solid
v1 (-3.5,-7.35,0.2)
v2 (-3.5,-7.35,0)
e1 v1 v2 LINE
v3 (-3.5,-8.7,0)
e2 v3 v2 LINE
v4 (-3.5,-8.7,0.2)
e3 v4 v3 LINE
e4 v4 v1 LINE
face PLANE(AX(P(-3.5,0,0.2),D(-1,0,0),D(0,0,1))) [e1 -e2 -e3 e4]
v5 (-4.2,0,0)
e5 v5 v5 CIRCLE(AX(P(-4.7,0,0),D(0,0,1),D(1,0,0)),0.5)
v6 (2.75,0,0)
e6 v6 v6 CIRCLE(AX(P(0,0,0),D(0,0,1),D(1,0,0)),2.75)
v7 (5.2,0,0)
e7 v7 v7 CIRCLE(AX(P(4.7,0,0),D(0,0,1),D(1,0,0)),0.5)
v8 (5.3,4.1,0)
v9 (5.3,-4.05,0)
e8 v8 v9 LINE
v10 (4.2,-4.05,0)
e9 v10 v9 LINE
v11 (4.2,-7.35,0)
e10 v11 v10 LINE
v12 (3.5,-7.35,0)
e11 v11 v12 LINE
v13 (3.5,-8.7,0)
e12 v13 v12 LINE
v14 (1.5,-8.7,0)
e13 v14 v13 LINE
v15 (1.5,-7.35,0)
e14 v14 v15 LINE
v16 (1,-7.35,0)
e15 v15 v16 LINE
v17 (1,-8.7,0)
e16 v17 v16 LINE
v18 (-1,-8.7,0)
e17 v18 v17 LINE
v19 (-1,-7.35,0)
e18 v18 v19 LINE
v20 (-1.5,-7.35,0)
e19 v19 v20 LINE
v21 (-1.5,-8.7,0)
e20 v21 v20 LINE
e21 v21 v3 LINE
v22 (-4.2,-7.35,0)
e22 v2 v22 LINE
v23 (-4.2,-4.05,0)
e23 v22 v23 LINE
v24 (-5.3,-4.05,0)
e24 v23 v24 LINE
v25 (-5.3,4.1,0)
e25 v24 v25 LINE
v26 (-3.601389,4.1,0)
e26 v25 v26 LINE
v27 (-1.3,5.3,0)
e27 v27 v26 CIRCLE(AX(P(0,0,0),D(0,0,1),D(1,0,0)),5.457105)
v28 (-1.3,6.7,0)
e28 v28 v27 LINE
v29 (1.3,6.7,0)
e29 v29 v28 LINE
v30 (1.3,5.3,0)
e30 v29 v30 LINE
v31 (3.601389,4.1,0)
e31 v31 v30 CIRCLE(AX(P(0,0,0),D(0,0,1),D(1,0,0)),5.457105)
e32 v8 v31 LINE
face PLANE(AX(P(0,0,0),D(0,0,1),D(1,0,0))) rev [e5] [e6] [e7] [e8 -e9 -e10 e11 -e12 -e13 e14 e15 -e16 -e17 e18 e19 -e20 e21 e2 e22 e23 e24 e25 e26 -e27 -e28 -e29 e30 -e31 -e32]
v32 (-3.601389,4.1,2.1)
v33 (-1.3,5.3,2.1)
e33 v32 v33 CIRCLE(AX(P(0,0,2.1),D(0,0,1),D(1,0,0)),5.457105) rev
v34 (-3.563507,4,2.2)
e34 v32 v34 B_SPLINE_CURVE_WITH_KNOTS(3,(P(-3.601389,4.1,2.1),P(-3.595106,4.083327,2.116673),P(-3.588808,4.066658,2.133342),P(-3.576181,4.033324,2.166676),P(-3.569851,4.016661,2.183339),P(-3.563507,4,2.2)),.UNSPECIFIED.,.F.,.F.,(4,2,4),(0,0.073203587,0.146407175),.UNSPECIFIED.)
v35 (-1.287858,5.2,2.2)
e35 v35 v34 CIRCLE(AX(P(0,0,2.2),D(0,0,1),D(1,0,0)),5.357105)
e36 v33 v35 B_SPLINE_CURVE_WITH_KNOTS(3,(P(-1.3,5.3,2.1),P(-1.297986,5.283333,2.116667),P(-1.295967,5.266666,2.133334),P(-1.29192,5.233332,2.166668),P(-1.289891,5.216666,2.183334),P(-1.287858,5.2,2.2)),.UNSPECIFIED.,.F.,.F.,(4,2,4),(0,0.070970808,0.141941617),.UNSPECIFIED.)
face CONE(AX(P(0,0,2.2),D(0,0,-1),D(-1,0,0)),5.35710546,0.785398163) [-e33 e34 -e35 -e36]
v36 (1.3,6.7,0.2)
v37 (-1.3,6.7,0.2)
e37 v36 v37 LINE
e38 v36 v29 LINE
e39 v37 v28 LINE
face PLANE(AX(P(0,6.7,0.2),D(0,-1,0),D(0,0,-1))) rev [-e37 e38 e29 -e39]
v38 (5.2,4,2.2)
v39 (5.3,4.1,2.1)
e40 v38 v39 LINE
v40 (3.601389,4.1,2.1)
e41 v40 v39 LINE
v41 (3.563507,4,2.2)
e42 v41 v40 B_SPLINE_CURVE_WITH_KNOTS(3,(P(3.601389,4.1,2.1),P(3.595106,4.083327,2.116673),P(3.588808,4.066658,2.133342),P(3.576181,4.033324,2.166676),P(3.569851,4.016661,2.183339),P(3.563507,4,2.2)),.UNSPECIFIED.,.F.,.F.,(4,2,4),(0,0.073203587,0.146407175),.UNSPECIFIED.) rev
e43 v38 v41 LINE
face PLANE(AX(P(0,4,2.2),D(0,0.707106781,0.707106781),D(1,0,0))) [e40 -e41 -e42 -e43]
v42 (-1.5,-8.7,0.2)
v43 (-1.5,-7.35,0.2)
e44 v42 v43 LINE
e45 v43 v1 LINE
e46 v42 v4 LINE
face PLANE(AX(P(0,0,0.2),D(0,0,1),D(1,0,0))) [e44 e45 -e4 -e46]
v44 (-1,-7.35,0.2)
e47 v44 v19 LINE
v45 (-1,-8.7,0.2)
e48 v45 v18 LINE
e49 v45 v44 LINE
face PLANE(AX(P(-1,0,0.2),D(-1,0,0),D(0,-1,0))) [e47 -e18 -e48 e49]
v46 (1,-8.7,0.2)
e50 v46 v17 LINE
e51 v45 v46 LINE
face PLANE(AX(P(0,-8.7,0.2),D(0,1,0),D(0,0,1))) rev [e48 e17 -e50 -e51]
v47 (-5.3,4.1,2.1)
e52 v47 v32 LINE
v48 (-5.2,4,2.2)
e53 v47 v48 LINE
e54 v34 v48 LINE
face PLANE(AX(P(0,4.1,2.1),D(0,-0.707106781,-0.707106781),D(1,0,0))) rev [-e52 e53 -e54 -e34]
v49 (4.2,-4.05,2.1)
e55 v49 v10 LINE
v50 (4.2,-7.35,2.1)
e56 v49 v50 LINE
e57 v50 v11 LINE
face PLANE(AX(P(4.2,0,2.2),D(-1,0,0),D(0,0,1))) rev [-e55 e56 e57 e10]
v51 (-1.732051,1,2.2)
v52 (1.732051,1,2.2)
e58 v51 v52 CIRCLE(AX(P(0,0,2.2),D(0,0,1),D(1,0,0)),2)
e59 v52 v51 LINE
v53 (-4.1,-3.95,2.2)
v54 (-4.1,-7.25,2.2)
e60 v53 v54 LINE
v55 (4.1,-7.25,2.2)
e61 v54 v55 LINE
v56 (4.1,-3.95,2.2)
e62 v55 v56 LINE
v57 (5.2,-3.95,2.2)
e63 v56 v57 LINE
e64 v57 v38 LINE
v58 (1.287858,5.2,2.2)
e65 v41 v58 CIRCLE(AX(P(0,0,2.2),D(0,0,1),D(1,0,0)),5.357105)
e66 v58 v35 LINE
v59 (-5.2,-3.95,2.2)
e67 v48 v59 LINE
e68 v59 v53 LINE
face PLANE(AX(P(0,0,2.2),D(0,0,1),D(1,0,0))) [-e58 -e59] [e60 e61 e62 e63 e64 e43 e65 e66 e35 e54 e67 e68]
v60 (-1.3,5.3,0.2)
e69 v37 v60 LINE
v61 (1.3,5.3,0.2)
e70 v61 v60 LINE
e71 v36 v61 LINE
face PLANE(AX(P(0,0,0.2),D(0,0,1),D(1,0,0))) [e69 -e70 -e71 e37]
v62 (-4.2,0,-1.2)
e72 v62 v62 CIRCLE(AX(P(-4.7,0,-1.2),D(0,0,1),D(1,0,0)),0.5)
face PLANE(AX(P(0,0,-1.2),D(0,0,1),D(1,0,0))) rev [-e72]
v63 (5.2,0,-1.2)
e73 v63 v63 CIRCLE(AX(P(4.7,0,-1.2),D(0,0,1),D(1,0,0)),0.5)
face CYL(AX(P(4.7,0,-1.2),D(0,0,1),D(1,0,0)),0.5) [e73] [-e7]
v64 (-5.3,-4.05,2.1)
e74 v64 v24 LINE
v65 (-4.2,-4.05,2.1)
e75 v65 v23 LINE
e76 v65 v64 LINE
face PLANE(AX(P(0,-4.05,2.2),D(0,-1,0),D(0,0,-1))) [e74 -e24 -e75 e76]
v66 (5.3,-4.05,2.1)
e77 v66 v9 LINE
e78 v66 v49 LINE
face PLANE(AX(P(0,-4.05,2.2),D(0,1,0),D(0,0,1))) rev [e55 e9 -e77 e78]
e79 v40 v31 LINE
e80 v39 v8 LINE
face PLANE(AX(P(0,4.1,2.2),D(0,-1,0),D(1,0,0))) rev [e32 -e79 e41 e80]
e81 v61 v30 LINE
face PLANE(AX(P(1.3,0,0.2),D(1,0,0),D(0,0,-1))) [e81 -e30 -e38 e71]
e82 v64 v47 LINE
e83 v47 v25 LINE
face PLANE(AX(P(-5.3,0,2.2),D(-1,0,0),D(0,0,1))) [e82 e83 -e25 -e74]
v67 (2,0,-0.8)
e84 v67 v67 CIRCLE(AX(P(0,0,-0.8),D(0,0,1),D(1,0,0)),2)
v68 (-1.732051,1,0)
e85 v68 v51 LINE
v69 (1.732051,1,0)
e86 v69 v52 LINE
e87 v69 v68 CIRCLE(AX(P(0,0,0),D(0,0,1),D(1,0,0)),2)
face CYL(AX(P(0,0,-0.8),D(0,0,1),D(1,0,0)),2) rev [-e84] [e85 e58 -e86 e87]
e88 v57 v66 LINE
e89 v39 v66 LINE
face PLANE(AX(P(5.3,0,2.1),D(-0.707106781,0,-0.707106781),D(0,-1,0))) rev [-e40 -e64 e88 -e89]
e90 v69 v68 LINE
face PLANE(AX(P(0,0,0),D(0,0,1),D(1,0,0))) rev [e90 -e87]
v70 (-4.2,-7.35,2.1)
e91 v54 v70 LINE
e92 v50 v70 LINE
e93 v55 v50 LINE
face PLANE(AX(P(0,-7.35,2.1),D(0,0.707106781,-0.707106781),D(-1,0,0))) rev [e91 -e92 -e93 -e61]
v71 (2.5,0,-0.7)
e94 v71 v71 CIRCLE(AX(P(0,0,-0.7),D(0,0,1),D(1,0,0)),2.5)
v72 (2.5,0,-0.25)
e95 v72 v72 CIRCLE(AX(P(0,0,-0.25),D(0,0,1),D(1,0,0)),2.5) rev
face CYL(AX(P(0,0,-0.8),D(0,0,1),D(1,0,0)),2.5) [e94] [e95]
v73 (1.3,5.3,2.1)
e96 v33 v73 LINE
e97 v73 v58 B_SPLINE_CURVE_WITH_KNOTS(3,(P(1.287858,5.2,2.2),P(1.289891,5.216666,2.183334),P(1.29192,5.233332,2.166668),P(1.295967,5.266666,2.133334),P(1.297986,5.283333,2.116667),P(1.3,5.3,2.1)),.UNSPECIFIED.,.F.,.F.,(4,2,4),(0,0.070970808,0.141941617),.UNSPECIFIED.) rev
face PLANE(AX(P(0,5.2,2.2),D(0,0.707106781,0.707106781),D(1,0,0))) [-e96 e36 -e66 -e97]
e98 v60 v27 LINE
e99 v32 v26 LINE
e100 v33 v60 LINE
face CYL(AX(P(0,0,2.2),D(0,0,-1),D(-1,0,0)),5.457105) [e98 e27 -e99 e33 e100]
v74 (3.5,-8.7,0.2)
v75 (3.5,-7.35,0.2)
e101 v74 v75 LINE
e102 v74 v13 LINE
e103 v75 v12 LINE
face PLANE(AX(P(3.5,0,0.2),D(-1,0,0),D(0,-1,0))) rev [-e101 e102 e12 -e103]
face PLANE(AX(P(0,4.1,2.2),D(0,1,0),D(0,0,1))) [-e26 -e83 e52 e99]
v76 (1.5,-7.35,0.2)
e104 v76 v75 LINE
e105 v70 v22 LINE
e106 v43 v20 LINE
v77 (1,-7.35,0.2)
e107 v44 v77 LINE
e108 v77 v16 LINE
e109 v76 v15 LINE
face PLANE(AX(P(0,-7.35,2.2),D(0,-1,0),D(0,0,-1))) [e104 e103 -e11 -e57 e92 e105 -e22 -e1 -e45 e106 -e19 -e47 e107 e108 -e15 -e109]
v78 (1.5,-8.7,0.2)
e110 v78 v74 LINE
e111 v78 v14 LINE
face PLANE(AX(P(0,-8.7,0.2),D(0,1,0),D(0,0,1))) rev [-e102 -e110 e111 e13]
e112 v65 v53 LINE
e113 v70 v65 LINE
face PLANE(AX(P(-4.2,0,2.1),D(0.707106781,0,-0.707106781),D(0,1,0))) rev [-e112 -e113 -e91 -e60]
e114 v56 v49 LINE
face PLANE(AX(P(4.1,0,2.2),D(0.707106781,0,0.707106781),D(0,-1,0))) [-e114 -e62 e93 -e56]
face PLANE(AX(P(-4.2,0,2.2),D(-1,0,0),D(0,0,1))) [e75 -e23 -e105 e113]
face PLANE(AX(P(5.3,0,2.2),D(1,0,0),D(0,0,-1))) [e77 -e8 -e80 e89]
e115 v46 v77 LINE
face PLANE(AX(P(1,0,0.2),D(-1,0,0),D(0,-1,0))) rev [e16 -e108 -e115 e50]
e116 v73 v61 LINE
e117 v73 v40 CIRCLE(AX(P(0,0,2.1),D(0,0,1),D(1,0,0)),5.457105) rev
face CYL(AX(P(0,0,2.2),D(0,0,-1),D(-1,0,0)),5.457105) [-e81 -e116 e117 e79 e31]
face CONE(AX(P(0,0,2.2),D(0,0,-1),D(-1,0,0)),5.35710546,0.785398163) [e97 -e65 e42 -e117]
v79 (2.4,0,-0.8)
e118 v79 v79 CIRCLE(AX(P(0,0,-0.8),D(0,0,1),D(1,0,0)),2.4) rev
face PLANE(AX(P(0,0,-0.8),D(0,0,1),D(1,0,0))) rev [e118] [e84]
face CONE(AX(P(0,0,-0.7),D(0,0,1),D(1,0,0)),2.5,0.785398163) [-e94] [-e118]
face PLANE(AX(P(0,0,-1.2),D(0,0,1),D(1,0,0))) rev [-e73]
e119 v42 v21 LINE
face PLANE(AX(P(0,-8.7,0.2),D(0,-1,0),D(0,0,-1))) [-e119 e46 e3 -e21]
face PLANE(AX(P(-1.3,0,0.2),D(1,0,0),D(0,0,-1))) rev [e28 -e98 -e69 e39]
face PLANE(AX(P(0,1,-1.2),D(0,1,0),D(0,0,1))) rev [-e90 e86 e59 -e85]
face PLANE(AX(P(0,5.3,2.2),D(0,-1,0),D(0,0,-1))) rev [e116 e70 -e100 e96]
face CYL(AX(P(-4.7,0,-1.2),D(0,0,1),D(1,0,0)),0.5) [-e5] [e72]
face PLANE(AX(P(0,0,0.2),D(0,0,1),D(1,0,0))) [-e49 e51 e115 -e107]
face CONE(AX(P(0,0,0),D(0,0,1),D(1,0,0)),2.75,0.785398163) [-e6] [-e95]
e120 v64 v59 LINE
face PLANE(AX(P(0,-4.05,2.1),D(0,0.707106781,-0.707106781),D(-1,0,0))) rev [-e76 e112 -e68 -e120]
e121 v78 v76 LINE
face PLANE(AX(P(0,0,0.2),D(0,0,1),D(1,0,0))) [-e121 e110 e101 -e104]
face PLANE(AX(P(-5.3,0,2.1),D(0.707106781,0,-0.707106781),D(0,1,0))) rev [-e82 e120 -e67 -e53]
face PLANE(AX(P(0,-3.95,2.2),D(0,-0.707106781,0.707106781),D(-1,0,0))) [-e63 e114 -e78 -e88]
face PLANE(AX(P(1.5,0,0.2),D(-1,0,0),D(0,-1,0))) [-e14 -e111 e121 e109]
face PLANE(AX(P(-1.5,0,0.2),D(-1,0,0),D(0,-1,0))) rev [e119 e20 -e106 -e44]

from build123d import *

# Parameters (mm, degrees)
MODEL_R        = 0.5
MODEL_R_2      = 2.5
MODEL_R_3      = 2
EXTRUDE1_DEPTH = 2.2
SKETCH_W       = 1
SKETCH_H       = 1.35
EXTRUDE2_DEPTH = 0.2
SKETCH_2_R     = 2.5
SKETCH_2_R_2   = 2
EXTRUDE3_DEPTH = 0.8
SKETCH_3_R     = 0.5
EXTRUDE4_DEPTH = 1.2
CHAMFER1_SIZE  = 0.1
CHAMFER2_SIZE  = 0.25
CHAMFER3_SIZE  = 0.1
EXTRUDE5_START = -2.2
EXTRUDE5_DEPTH = 2.2


# Read off the part's stored shape, not the designer's step: Extrude5
with BuildPart() as part:
    # Model → Extrude1 (new body)
    # profile 1 of 5: a face of its own
    with BuildSketch(Plane.XY):
        with BuildLine():
            Line((0, 5.3), (-1.3, 5.3))
            ThreePointArc((-1.3, 5.3), (-2.523074038, 4.838811569), (-3.601388621, 4.1))
            Line((-3.601388621, 4.1), (-5.3, 4.1))
            Line((-5.3, 4.1), (-5.3, 0))
            Line((-5.3, 0), (-5.3, -4.05))
            Line((-5.3, -4.05), (-4.2, -4.05))
            Line((-4.2, -4.05), (-4.2, -7.35))
            Line((-4.2, -7.35), (0, -7.35))
            Line((0, -7.35), (4.2, -7.35))
            Line((4.2, -7.35), (4.2, -4.05))
            Line((4.2, -4.05), (5.3, -4.05))
            Line((5.3, -4.05), (5.3, 0))
            Line((5.3, 0), (5.3, 4.1))
            Line((5.3, 4.1), (3.601388621, 4.1))
            ThreePointArc((3.601388621, 4.1), (2.523074038, 4.838811569), (1.3, 5.3))
            Line((1.3, 5.3), (0, 5.3))
        make_face()
        with Locations((4.7, 0)):
            Circle(MODEL_R, mode=Mode.SUBTRACT)
        with Locations((-4.7, 0)):
            Circle(MODEL_R, mode=Mode.SUBTRACT)
        Circle(MODEL_R_2, mode=Mode.SUBTRACT)
    # profile 2 of 5: a face of its own
    with BuildSketch(Plane.XY):
        with Locations((-4.7, 0)):
            Circle(MODEL_R)
    # profile 3 of 5: a face of its own
    with BuildSketch(Plane.XY):
        with Locations((4.7, 0)):
            Circle(MODEL_R)
    # profile 4 of 5: a face of its own
    with BuildSketch(Plane.XY):
        Circle(MODEL_R_2)
        Circle(MODEL_R_3, mode=Mode.SUBTRACT)
    # profile 5 of 5: a face of its own
    with BuildSketch(Plane.XY):
        Circle(MODEL_R_3)
    extrude(amount=EXTRUDE1_DEPTH)

    # Sketch → Extrude2 (add)
    with BuildSketch(Plane.XY):
        Polygon((0, 6.7), (-1.3, 6.7), (-1.3, 5.3), (0, 5.3), (1.3, 5.3), (1.3, 6.7), align=None)
        with Locations((-2, -8.025)):
            Rectangle(SKETCH_W, SKETCH_H)
        with Locations((-3, -8.025)):
            Rectangle(SKETCH_W, SKETCH_H)
        Polygon((1, -8.7), (1, -7.35), (0, -7.35), (-1, -7.35), (-1, -8.7), (0, -8.7), align=None)
        with Locations((2, -8.025)):
            Rectangle(SKETCH_W, SKETCH_H)
        with Locations((3, -8.025)):
            Rectangle(SKETCH_W, SKETCH_H)
    extrude(amount=EXTRUDE2_DEPTH)

    # Sketch 2 → Extrude3 (add)
    with BuildSketch(Plane.XY):
        Circle(SKETCH_2_R)
        Circle(SKETCH_2_R_2, mode=Mode.SUBTRACT)
    extrude(amount=-EXTRUDE3_DEPTH)

    # Sketch 3 → Extrude4 (add)
    with BuildSketch(Plane.XY):
        with Locations((4.7, 0)):
            Circle(SKETCH_3_R)
        with Locations((-4.7, 0)):
            Circle(SKETCH_3_R)
    extrude(amount=-EXTRUDE4_DEPTH)

    # Chamfer1
    chamfer1_edges = [part.edges().sort_by_distance(p)[0] for p in [
        (-4.450694311, 4.1, 2.2),
        (-5.3, 0.025, 2.2),
        (-4.75, -4.05, 2.2),
        (-4.2, -5.7, 2.2),
        (0, -7.35, 2.2),
        (4.2, -5.7, 2.2),
        (0, 5.3, 2.2),
        (4.75, -4.05, 2.2),
        (5.3, 0.025, 2.2),
        (4.450694311, 4.1, 2.2),
        (2.523074038, 4.838811569, 2.2),
        (-2.523074038, 4.838811569, 2.2),
    ]]
    chamfer(chamfer1_edges, length=CHAMFER1_SIZE)

    # Chamfer2
    chamfer2_edges = [part.edges().sort_by_distance(p)[0] for p in [
        (-2.5, 0, 0),
    ]]
    chamfer(chamfer2_edges, length=CHAMFER2_SIZE)

    # Chamfer3
    chamfer3_edges = [part.edges().sort_by_distance(p)[0] for p in [
        (-2.5, 0, -0.8),
    ]]
    chamfer(chamfer3_edges, length=CHAMFER3_SIZE)

    # Extrude5 outline → Extrude5 (cut)
    with BuildSketch(Plane.XY.offset(2.2).offset(EXTRUDE5_START)):
        with BuildLine():
            ThreePointArc((-1.732050808, 1), (0, -2), (1.732050808, 1))
            Line((1.732050808, 1), (-1.732050808, 1))
        make_face()
    extrude(amount=EXTRUDE5_DEPTH, mode=Mode.SUBTRACT)


solid = part.part
